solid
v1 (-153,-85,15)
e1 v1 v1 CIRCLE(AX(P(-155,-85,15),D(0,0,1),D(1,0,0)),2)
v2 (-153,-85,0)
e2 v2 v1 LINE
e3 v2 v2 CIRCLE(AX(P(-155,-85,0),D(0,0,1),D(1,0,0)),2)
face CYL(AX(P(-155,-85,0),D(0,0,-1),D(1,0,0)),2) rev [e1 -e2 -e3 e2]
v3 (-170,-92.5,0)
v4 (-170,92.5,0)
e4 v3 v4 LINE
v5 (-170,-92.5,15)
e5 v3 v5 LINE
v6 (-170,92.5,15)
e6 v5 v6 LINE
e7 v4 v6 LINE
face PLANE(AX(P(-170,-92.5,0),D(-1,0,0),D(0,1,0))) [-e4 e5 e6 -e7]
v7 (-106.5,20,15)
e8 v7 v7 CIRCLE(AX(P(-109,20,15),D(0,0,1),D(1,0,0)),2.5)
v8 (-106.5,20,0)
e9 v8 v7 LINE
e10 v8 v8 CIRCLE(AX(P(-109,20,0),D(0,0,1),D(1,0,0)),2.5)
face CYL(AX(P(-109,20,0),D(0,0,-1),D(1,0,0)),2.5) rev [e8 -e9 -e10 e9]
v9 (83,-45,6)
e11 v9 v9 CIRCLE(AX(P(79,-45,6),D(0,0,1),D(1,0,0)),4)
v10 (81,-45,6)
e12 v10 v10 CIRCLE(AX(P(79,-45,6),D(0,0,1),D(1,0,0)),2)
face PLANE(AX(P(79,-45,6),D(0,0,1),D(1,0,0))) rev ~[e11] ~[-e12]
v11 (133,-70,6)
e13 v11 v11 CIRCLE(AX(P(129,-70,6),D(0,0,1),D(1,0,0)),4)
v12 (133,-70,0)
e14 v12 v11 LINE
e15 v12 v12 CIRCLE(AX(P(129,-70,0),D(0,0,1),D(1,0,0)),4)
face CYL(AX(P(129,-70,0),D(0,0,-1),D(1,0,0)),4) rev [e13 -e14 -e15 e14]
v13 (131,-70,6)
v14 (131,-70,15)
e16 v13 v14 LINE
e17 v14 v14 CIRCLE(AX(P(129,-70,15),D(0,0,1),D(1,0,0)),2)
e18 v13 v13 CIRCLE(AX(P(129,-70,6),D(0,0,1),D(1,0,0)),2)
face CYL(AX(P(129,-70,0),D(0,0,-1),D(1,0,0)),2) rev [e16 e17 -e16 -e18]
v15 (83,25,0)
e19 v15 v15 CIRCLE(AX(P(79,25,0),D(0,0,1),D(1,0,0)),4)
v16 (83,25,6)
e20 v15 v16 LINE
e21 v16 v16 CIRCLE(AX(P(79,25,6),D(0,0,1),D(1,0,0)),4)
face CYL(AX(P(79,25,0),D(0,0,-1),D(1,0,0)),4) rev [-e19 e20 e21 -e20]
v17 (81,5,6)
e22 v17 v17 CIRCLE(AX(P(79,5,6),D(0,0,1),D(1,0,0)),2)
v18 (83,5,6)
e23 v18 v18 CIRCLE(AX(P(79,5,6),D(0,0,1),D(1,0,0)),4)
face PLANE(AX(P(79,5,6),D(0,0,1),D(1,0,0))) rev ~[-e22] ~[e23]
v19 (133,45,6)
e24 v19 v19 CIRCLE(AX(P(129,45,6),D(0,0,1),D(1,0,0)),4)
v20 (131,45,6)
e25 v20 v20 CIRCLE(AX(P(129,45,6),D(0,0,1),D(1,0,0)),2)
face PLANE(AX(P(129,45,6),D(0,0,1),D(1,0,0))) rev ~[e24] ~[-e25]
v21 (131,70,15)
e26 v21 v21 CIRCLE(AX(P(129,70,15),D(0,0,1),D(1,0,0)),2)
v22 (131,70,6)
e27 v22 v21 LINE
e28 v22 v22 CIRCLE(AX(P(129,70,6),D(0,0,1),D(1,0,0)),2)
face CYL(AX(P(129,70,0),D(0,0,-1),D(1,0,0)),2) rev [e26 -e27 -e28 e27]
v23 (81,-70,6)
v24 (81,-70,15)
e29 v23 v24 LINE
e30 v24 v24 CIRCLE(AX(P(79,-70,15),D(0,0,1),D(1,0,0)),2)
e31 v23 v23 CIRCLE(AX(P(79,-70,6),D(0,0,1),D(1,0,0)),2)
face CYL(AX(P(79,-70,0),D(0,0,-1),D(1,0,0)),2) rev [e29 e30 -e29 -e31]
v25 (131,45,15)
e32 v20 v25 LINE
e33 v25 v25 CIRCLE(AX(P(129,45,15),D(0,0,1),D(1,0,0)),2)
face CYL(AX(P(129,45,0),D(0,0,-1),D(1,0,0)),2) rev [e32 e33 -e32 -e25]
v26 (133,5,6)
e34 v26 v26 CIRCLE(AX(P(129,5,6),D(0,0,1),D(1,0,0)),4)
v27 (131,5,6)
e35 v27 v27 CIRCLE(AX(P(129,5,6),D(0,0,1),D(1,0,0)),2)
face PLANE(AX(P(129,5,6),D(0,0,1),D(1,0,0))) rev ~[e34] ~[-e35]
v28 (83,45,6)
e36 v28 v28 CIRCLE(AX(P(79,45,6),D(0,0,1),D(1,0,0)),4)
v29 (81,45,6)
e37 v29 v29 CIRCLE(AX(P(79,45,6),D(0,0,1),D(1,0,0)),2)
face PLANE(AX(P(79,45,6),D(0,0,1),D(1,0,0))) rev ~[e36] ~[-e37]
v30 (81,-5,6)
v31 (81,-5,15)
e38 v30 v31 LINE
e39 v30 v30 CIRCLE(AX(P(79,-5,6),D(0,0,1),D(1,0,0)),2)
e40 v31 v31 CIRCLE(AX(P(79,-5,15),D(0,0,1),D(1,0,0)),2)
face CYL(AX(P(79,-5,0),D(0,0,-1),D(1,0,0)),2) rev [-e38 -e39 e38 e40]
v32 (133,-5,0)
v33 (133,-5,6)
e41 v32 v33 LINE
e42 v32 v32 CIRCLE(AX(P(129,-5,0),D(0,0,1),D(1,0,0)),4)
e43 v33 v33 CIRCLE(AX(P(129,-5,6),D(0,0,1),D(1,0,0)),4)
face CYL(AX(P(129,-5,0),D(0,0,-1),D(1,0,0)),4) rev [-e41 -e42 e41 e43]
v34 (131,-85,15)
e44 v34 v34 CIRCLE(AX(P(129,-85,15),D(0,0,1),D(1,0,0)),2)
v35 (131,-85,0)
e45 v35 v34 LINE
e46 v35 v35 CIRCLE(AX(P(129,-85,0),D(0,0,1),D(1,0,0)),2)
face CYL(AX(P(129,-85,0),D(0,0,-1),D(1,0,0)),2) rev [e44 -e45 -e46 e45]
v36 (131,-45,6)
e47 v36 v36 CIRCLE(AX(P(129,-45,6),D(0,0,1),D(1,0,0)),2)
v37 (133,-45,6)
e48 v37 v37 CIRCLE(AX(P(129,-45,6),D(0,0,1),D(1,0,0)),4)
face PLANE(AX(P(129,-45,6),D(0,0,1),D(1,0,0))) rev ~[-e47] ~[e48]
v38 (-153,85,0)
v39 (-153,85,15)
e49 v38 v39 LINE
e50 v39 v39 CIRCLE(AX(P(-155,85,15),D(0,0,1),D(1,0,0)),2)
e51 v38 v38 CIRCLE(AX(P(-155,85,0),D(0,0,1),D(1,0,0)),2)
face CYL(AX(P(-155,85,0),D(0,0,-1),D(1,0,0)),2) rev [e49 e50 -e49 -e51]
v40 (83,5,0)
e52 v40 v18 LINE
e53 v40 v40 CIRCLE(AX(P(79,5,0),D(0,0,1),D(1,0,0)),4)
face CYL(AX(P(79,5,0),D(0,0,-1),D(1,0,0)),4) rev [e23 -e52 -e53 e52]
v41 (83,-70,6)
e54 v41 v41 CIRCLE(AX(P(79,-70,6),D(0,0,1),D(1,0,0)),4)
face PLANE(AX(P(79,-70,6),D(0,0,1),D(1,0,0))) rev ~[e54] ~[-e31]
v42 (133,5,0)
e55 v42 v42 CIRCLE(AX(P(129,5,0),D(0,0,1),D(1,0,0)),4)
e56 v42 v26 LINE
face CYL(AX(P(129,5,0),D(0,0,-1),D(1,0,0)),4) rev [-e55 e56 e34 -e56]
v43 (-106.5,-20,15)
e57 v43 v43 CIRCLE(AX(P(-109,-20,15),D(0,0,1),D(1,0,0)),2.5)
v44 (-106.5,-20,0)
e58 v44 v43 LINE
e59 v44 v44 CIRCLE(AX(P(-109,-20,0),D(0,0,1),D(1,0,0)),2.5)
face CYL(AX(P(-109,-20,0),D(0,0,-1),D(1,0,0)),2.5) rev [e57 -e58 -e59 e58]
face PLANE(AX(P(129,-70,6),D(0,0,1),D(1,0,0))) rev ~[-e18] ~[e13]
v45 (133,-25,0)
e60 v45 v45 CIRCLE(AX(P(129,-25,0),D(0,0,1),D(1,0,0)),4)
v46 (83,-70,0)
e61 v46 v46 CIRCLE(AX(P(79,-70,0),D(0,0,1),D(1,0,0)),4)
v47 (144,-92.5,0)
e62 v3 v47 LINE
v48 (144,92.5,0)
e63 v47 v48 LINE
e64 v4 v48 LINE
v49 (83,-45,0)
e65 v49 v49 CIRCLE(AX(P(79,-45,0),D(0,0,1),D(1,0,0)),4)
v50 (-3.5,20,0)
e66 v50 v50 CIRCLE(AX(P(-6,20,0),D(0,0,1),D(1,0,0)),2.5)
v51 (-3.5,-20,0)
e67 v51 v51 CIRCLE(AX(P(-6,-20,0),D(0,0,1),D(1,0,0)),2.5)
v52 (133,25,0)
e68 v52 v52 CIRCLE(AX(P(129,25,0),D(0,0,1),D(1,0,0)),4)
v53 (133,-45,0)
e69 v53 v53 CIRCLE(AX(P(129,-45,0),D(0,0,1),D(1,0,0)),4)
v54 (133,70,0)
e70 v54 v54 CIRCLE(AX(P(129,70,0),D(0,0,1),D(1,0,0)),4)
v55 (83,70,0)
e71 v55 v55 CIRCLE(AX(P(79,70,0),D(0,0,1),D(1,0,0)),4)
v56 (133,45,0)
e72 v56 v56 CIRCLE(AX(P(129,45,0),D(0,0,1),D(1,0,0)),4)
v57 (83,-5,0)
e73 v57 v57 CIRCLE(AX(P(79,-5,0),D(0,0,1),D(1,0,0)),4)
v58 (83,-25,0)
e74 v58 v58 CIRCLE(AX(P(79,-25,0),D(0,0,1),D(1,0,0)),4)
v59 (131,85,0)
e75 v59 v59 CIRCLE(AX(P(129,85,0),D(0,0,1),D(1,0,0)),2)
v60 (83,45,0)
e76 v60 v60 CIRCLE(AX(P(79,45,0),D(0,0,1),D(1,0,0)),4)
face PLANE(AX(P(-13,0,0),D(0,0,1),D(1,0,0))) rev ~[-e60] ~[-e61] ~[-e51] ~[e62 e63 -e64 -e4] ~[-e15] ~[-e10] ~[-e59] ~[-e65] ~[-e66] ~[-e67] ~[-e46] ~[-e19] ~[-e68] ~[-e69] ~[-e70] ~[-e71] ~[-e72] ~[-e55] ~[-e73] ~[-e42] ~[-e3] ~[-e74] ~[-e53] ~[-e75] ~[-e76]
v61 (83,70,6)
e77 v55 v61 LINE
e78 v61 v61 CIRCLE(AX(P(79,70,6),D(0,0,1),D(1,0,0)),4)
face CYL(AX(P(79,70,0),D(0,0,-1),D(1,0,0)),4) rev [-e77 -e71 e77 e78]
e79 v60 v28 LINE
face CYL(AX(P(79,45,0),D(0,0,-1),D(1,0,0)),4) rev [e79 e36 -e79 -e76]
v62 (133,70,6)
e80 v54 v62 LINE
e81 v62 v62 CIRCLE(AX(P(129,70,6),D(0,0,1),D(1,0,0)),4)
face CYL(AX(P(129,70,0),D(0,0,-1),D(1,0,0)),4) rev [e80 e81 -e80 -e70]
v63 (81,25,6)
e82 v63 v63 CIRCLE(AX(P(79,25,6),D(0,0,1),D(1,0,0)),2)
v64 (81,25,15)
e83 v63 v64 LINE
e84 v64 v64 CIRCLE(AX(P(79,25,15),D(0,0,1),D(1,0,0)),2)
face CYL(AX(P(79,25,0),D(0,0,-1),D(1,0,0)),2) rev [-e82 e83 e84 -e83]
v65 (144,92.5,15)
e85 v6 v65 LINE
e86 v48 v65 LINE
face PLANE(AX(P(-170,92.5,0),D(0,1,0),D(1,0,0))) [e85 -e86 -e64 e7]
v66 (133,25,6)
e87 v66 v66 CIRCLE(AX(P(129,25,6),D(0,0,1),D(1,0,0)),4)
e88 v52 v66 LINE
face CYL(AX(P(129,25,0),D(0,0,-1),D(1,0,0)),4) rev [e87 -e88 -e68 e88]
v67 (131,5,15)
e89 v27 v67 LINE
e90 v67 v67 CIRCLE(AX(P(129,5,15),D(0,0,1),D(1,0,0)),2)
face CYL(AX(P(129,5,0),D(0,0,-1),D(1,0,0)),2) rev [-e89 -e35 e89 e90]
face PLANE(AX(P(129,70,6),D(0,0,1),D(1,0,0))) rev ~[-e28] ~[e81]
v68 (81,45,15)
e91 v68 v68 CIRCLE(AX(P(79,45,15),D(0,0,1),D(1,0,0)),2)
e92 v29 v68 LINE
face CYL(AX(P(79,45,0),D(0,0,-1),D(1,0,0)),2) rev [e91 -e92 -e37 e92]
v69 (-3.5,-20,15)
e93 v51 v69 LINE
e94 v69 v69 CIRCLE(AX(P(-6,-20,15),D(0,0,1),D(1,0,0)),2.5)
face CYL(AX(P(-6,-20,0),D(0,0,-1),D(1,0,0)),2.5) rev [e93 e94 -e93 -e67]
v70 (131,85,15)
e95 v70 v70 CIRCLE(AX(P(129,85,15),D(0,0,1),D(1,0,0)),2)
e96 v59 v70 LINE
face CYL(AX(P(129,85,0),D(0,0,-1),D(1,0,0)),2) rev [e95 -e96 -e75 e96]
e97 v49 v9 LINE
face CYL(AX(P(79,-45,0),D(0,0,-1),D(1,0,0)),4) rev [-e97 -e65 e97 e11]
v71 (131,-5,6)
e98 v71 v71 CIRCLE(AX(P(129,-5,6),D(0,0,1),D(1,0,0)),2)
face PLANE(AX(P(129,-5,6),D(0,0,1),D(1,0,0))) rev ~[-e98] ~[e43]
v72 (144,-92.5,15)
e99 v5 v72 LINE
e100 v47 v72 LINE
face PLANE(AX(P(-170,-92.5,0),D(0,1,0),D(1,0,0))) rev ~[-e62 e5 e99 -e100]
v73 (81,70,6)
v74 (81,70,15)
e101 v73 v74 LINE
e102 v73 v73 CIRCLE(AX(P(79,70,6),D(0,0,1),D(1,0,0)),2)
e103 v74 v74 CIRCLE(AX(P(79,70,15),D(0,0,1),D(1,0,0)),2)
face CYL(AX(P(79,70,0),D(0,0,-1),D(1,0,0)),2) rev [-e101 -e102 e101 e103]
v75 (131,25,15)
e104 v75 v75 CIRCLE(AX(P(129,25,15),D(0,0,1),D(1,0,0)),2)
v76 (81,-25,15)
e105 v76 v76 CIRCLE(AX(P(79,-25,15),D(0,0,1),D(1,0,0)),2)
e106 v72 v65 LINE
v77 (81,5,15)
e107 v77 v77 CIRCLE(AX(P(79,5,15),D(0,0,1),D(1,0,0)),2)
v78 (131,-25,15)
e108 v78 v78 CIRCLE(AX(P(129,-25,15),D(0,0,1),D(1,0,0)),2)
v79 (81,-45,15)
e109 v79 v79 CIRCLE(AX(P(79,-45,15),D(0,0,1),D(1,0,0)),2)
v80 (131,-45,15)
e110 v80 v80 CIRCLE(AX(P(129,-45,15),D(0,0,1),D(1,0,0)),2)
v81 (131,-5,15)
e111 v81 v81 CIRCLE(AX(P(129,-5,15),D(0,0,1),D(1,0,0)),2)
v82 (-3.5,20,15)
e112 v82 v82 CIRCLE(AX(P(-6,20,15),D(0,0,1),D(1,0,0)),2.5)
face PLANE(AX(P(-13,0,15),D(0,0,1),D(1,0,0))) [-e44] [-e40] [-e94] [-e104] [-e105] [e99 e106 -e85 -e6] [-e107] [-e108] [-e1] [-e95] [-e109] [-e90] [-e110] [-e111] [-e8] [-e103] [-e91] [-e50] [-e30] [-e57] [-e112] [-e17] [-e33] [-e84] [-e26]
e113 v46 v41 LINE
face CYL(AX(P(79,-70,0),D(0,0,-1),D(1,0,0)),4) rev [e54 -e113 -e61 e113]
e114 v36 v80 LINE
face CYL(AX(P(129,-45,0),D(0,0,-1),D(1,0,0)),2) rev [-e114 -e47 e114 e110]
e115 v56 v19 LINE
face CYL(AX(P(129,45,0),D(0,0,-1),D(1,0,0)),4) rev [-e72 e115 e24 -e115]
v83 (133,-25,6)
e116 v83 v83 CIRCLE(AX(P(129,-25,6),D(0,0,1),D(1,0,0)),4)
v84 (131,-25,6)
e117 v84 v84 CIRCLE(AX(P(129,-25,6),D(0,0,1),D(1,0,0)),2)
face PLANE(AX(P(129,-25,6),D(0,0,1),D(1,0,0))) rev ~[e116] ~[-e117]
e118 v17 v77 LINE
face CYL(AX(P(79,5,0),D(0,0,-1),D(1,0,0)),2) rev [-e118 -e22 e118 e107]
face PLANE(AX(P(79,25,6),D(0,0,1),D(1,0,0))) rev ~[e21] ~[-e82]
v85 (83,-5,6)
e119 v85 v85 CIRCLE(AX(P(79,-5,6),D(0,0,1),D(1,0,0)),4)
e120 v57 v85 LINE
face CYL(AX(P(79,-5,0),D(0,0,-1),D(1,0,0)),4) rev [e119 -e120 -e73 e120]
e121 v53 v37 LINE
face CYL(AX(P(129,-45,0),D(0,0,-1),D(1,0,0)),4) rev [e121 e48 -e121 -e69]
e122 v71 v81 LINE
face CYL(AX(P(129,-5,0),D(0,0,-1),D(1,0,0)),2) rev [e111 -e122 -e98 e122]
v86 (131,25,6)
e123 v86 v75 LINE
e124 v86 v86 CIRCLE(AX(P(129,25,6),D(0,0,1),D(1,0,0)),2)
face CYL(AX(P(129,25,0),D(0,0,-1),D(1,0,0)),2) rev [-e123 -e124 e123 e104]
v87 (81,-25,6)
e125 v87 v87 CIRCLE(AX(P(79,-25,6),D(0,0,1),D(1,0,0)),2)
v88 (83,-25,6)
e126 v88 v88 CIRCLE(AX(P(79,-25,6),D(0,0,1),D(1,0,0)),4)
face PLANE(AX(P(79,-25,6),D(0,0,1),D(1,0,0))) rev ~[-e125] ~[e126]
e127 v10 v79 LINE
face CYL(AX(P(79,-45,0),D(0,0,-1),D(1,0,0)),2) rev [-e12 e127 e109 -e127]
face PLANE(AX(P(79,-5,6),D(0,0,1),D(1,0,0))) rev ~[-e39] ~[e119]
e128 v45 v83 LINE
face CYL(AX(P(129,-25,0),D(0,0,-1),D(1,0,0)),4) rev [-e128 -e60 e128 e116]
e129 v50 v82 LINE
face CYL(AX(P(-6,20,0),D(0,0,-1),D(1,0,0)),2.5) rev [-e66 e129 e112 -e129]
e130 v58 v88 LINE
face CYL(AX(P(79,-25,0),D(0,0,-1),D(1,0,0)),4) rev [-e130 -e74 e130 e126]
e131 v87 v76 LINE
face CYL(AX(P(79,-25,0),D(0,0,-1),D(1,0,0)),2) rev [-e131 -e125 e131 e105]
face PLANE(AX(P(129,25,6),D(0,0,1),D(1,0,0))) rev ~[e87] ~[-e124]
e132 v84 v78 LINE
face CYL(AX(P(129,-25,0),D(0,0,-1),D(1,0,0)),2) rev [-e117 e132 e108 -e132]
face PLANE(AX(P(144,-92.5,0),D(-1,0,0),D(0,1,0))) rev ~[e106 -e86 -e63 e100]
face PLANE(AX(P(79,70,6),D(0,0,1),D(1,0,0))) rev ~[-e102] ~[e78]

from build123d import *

# Parameters (mm, degrees)
F0_W     = 314
F0_H     = 185
F0_R     = 4
F0_R_2   = 2.5
F0_R_3   = 2
F1_DEPTH = 15
F2_DEPTH = 6


# Not quite as in the source:
# - a feature names something its author has since deleted; it is built from what else it names


with BuildPart() as f1:
    # F0 (on Top) → F1 (new body)
    with BuildSketch(Plane.XY):
        with Locations((-13, 0)):
            Rectangle(F0_W, F0_H)
        with Locations((-155, -85)):
            Circle(F0_R, mode=Mode.SUBTRACT)
        with Locations((-109, -20)):
            Circle(F0_R_2, mode=Mode.SUBTRACT)
        with Locations((79, -70)):
            Circle(F0_R, mode=Mode.SUBTRACT)
        with Locations((129, -85)):
            Circle(F0_R, mode=Mode.SUBTRACT)
        with Locations((129, -70)):
            Circle(F0_R, mode=Mode.SUBTRACT)
        with Locations((-6, -20)):
            Circle(F0_R_2, mode=Mode.SUBTRACT)
        with Locations((79, -45)):
            Circle(F0_R, mode=Mode.SUBTRACT)
        with Locations((79, -25)):
            Circle(F0_R, mode=Mode.SUBTRACT)
        with Locations((129, -45)):
            Circle(F0_R, mode=Mode.SUBTRACT)
        with Locations((129, -25)):
            Circle(F0_R, mode=Mode.SUBTRACT)
        with Locations((79, -5)):
            Circle(F0_R, mode=Mode.SUBTRACT)
        with Locations((129, -5)):
            Circle(F0_R, mode=Mode.SUBTRACT)
        with Locations((-109, 20)):
            Circle(F0_R_2, mode=Mode.SUBTRACT)
        with Locations((-155, 85)):
            Circle(F0_R, mode=Mode.SUBTRACT)
        with Locations((-6, 20)):
            Circle(F0_R_2, mode=Mode.SUBTRACT)
        with Locations((79, 5)):
            Circle(F0_R, mode=Mode.SUBTRACT)
        with Locations((129, 5)):
            Circle(F0_R, mode=Mode.SUBTRACT)
        with Locations((79, 25)):
            Circle(F0_R, mode=Mode.SUBTRACT)
        with Locations((79, 45)):
            Circle(F0_R, mode=Mode.SUBTRACT)
        with Locations((129, 25)):
            Circle(F0_R, mode=Mode.SUBTRACT)
        with Locations((129, 45)):
            Circle(F0_R, mode=Mode.SUBTRACT)
        with Locations((79, 70)):
            Circle(F0_R, mode=Mode.SUBTRACT)
        with Locations((129, 70)):
            Circle(F0_R, mode=Mode.SUBTRACT)
        with Locations((129, 85)):
            Circle(F0_R, mode=Mode.SUBTRACT)
        with Locations((79, 25)):
            Circle(F0_R)
        with Locations((79, 25)):
            Circle(F0_R_3, mode=Mode.SUBTRACT)
        with Locations((79, -70)):
            Circle(F0_R)
        with Locations((79, -70)):
            Circle(F0_R_3, mode=Mode.SUBTRACT)
        with Locations((129, -70)):
            Circle(F0_R)
        with Locations((129, -70)):
            Circle(F0_R_3, mode=Mode.SUBTRACT)
        with Locations((129, -85)):
            Circle(F0_R)
        with Locations((129, -85)):
            Circle(F0_R_3, mode=Mode.SUBTRACT)
        with Locations((129, 85)):
            Circle(F0_R)
        with Locations((129, 85)):
            Circle(F0_R_3, mode=Mode.SUBTRACT)
        with Locations((129, 70)):
            Circle(F0_R)
        with Locations((129, 70)):
            Circle(F0_R_3, mode=Mode.SUBTRACT)
        with Locations((129, 25)):
            Circle(F0_R)
        with Locations((129, 25)):
            Circle(F0_R_3, mode=Mode.SUBTRACT)
        with Locations((79, 70)):
            Circle(F0_R)
        with Locations((79, 70)):
            Circle(F0_R_3, mode=Mode.SUBTRACT)
        with Locations((-155, 85)):
            Circle(F0_R)
        with Locations((-155, 85)):
            Circle(F0_R_3, mode=Mode.SUBTRACT)
        with Locations((-155, -85)):
            Circle(F0_R)
        with Locations((-155, -85)):
            Circle(F0_R_3, mode=Mode.SUBTRACT)
        with Locations((79, 45)):
            Circle(F0_R)
        with Locations((79, 45)):
            Circle(F0_R_3, mode=Mode.SUBTRACT)
        with Locations((79, 5)):
            Circle(F0_R)
        with Locations((79, 5)):
            Circle(F0_R_3, mode=Mode.SUBTRACT)
        with Locations((79, -5)):
            Circle(F0_R)
        with Locations((79, -5)):
            Circle(F0_R_3, mode=Mode.SUBTRACT)
        with Locations((79, -25)):
            Circle(F0_R)
        with Locations((79, -25)):
            Circle(F0_R_3, mode=Mode.SUBTRACT)
        with Locations((79, -45)):
            Circle(F0_R)
        with Locations((79, -45)):
            Circle(F0_R_3, mode=Mode.SUBTRACT)
        with Locations((129, -45)):
            Circle(F0_R)
        with Locations((129, -45)):
            Circle(F0_R_3, mode=Mode.SUBTRACT)
        with Locations((129, -25)):
            Circle(F0_R)
        with Locations((129, -25)):
            Circle(F0_R_3, mode=Mode.SUBTRACT)
        with Locations((129, -5)):
            Circle(F0_R)
        with Locations((129, -5)):
            Circle(F0_R_3, mode=Mode.SUBTRACT)
        with Locations((129, 5)):
            Circle(F0_R)
        with Locations((129, 5)):
            Circle(F0_R_3, mode=Mode.SUBTRACT)
        with Locations((129, 45)):
            Circle(F0_R)
        with Locations((129, 45)):
            Circle(F0_R_3, mode=Mode.SUBTRACT)
    extrude(amount=F1_DEPTH)

    # F0 (on Top) → F2 (cut)
    with BuildSketch(Plane.XY):
        with Locations((79, 25)):
            Circle(F0_R)
        with Locations((79, 25)):
            Circle(F0_R_3, mode=Mode.SUBTRACT)
        with Locations((129, 25)):
            Circle(F0_R)
        with Locations((129, 25)):
            Circle(F0_R_3, mode=Mode.SUBTRACT)
        with Locations((129, 70)):
            Circle(F0_R)
        with Locations((129, 70)):
            Circle(F0_R_3, mode=Mode.SUBTRACT)
        with Locations((79, 70)):
            Circle(F0_R)
        with Locations((79, 70)):
            Circle(F0_R_3, mode=Mode.SUBTRACT)
        with Locations((79, -70)):
            Circle(F0_R)
        with Locations((79, -70)):
            Circle(F0_R_3, mode=Mode.SUBTRACT)
        with Locations((129, -70)):
            Circle(F0_R)
        with Locations((129, -70)):
            Circle(F0_R_3, mode=Mode.SUBTRACT)
        with Locations((79, 45)):
            Circle(F0_R)
        with Locations((79, 45)):
            Circle(F0_R_3, mode=Mode.SUBTRACT)
        with Locations((129, 45)):
            Circle(F0_R)
        with Locations((129, 45)):
            Circle(F0_R_3, mode=Mode.SUBTRACT)
        with Locations((129, 5)):
            Circle(F0_R)
        with Locations((129, 5)):
            Circle(F0_R_3, mode=Mode.SUBTRACT)
        with Locations((129, -5)):
            Circle(F0_R)
        with Locations((129, -5)):
            Circle(F0_R_3, mode=Mode.SUBTRACT)
        with Locations((129, -25)):
            Circle(F0_R)
        with Locations((129, -25)):
            Circle(F0_R_3, mode=Mode.SUBTRACT)
        with Locations((129, -45)):
            Circle(F0_R)
        with Locations((129, -45)):
            Circle(F0_R_3, mode=Mode.SUBTRACT)
        with Locations((79, -45)):
            Circle(F0_R)
        with Locations((79, -45)):
            Circle(F0_R_3, mode=Mode.SUBTRACT)
        with Locations((79, -25)):
            Circle(F0_R)
        with Locations((79, -25)):
            Circle(F0_R_3, mode=Mode.SUBTRACT)
        with Locations((79, -5)):
            Circle(F0_R)
        with Locations((79, -5)):
            Circle(F0_R_3, mode=Mode.SUBTRACT)
        with Locations((79, 5)):
            Circle(F0_R)
        with Locations((79, 5)):
            Circle(F0_R_3, mode=Mode.SUBTRACT)
    extrude(amount=F2_DEPTH, mode=Mode.SUBTRACT)


solid = f1.part
